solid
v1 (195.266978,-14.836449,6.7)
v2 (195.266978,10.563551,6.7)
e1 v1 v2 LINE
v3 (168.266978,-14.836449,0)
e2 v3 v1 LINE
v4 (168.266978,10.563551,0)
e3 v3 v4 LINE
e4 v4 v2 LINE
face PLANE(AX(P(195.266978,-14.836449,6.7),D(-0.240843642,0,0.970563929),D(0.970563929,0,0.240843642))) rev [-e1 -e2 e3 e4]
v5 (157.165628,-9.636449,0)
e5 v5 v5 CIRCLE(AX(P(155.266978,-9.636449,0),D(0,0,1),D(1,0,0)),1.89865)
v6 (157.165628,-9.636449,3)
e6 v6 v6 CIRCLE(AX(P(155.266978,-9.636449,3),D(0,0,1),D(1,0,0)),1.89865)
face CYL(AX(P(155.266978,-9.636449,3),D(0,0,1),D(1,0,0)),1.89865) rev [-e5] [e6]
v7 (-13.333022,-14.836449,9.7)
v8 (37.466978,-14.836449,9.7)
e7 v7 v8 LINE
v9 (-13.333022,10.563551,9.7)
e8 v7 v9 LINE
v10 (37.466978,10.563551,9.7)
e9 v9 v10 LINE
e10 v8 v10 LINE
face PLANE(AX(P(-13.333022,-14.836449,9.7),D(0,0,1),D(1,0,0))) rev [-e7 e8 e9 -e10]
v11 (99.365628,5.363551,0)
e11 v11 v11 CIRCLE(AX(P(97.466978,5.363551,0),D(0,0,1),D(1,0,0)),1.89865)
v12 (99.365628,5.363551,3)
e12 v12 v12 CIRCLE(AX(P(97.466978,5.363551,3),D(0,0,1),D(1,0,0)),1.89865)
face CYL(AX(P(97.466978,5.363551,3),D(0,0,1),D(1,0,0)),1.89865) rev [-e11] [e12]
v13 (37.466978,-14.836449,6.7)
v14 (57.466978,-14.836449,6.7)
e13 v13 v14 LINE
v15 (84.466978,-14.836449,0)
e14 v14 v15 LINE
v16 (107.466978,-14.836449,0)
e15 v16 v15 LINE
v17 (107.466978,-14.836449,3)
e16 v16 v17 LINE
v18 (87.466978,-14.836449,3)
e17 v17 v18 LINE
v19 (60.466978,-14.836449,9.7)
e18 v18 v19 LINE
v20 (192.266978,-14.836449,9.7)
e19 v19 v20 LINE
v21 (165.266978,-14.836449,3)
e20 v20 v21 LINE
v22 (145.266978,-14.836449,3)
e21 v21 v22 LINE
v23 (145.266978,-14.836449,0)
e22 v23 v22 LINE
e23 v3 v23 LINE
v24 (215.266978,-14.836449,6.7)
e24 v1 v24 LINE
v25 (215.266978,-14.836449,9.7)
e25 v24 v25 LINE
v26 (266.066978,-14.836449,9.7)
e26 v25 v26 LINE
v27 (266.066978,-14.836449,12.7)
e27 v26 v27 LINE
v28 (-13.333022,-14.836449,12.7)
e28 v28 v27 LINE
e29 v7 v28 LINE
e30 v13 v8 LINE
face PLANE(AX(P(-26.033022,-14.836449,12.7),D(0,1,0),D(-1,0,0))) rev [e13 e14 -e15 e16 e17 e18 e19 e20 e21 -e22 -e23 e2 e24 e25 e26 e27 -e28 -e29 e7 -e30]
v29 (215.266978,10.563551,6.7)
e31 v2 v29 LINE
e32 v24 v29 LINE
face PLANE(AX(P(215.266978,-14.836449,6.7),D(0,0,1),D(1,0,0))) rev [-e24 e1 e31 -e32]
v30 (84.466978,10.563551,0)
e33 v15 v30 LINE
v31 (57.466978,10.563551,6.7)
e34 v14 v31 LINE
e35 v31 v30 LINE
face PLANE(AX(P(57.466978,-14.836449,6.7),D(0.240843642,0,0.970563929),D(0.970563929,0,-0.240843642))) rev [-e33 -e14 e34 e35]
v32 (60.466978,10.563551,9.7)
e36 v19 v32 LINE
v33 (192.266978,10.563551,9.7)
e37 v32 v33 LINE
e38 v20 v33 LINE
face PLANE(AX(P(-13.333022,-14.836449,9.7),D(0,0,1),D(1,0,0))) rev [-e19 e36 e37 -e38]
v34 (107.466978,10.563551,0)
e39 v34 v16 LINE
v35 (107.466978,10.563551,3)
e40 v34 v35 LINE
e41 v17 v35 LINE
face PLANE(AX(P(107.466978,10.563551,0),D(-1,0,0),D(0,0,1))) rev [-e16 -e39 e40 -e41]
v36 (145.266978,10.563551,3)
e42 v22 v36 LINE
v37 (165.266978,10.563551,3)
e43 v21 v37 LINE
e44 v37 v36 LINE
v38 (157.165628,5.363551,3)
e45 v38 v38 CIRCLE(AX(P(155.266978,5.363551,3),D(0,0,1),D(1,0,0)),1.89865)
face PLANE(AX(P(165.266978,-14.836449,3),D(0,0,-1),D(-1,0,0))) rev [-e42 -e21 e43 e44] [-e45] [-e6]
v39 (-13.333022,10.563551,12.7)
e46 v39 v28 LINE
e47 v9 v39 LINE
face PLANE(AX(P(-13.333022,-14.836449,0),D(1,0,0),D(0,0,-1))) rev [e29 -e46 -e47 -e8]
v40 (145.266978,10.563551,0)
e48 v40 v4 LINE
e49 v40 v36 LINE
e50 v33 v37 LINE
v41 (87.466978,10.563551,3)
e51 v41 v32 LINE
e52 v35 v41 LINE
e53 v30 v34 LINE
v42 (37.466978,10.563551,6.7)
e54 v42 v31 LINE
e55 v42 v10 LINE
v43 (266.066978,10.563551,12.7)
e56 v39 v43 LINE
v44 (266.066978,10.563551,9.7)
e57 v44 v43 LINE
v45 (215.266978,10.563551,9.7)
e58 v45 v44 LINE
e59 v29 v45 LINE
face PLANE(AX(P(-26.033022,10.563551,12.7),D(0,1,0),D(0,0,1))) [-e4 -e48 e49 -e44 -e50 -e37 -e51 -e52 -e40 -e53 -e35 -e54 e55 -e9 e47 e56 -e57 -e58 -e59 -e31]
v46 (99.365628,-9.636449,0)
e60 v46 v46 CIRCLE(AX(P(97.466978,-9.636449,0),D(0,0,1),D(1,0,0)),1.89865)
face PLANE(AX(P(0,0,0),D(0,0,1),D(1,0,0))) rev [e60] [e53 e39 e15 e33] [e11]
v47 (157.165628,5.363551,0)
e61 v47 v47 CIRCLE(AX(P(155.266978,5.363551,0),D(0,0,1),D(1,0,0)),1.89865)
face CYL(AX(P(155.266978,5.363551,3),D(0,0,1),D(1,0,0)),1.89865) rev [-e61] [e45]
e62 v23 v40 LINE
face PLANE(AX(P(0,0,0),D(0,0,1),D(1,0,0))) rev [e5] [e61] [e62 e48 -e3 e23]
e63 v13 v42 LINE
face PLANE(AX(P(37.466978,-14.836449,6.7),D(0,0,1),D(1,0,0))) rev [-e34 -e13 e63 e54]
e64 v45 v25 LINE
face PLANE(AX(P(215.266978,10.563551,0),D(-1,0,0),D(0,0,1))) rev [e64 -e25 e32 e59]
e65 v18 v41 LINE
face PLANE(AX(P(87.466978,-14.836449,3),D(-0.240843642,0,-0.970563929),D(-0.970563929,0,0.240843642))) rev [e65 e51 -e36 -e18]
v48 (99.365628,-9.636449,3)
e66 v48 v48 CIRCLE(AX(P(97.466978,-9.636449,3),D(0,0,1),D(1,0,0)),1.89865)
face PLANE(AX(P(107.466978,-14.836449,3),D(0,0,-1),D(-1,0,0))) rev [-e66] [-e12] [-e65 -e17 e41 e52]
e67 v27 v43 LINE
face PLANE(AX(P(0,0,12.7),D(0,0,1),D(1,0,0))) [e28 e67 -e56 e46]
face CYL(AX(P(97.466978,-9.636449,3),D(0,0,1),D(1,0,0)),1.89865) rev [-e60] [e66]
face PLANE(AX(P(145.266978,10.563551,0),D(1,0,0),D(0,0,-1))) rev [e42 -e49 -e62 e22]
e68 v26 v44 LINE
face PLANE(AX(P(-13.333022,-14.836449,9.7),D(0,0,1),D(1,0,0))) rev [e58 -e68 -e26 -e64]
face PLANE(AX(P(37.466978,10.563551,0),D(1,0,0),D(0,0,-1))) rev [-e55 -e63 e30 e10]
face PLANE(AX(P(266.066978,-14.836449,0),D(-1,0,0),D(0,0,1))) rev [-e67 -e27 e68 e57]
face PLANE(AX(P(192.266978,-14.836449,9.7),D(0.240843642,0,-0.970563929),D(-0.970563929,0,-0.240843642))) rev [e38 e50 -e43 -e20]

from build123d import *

# Parameters (mm, degrees)
SKETCH1_W                 = 304.8
SKETCH1_H                 = 25.4
BOSS_EXTRUDE2_DEPTH       = 12.7
FILLET1_R                 = 12.7
CUT_EXTRUDE3_DEPTH        = 281.209703849
SKETCH8_W                 = 70
SKETCH8_H                 = 25.4
BOSS_EXTRUDE3_DEPTH       = 9.7
CUT_EXTRUDE4_DEPTH        = 281.209703849
CUT_EXTRUDE5_DEPTH        = 281.209703849
SKETCH13_W                = 12.7
SKETCH13_H                = 25.4
CUT_EXTRUDE7_DEPTH        = 280.450243045
F_6_CLEARANCE_HOLE1_D     = 3.7973
F_6_CLEARANCE_HOLE1_DEPTH = 3


with BuildPart() as part:
    # Sketch1 → Boss-Extrude2 (new body)
    with BuildSketch(Plane.XY):
        with Locations((126.366978193, -2.136448598)):
            Rectangle(SKETCH1_W, SKETCH1_H)
    extrude(amount=BOSS_EXTRUDE2_DEPTH)

    # Fillet1
    fillet1_edges = [part.edges().sort_by_distance(p)[0] for p in [
        (-26.033021807, -2.136448598, 12.7),
        (278.766978193, -2.136448598, 12.7),
    ]]
    fillet(fillet1_edges, radius=FILLET1_R - 0.0001)  # a hair under: the kernel refuses the full size

    # Sketch6 → Cut-Extrude3 (cut, through all)
    with BuildSketch(Plane(origin=(0, 10.563551402, 0), x_dir=(1, 0, 0), z_dir=(0, 1, 0))):
        with BuildLine():
            Line((-23.033021807, 0), (275.766978193, 0))
            ThreePointArc((275.766978193, 0), (272.925913971, -6.858935778), (266.066978193, -9.7))
            Line((266.066978193, -9.7), (-13.333021807, -9.7))
            ThreePointArc((-13.333021807, -9.7), (-20.191957584, -6.858935778), (-23.033021807, 0))
        make_face()
    extrude(amount=-CUT_EXTRUDE3_DEPTH, mode=Mode.SUBTRACT)

    # Sketch8 → Boss-Extrude3 (add)
    with BuildSketch(Plane(origin=(0, 0, 9.7), x_dir=(-1, 0, 0), z_dir=(0, 0, -1))):
        with Locations((-180.266978193, -2.136448598)):
            Rectangle(SKETCH8_W, SKETCH8_H)
        with Locations((-72.466978193, -2.136448598)):
            Rectangle(SKETCH8_W, SKETCH8_H)
    extrude(amount=BOSS_EXTRUDE3_DEPTH)

    # Sketch9 → Cut-Extrude4 (cut, through all)
    with BuildSketch(Plane(origin=(0, 10.563551402, 0), x_dir=(1, 0, 0), z_dir=(0, 1, 0))):
        Polygon((145.266978193, -9.7), (165.266978193, -9.7), (192.266978193, -9.7), (165.266978193, -3), (145.266978193, -3), align=None)
        Polygon((215.266978193, -6.7), (195.266978193, -6.7), (168.266978193, 0), (215.266978193, 0), align=None)
    extrude(amount=-CUT_EXTRUDE4_DEPTH, mode=Mode.SUBTRACT)

    # Sketch12 → Cut-Extrude5 (cut, through all)
    with BuildSketch(Plane(origin=(0, 10.563551402, 0), x_dir=(1, 0, 0), z_dir=(0, 1, 0))):
        Polygon((107.466978193, -9.7), (107.466978193, -3), (87.466978193, -3), (60.466978193, -9.7), align=None)
        Polygon((37.466978193, -6.7), (57.466978193, -6.7), (84.466978193, 0), (37.466978193, 0), align=None)
    extrude(amount=-CUT_EXTRUDE5_DEPTH, mode=Mode.SUBTRACT)

    # Sketch13 → Cut-Extrude7 (cut, through all)
    with BuildSketch(Plane.XY.offset(12.7)):
        with Locations((-19.683021807, -2.136448598)):
            Rectangle(SKETCH13_W, SKETCH13_H)
        with Locations((272.416978193, -2.136448598)):
            Rectangle(SKETCH13_W, SKETCH13_H)
    extrude(amount=-CUT_EXTRUDE7_DEPTH, mode=Mode.SUBTRACT)

    # #6 Clearance Hole1
    with Locations(Plane.XY.offset(3)):
        with Locations((97.466978193, 5.363551402), (97.466978193, -9.636448598), (155.266978193, -9.636448598), (155.266978193, 5.363551402)):
            Hole(F_6_CLEARANCE_HOLE1_D / 2, depth=F_6_CLEARANCE_HOLE1_DEPTH)


solid = part.part
